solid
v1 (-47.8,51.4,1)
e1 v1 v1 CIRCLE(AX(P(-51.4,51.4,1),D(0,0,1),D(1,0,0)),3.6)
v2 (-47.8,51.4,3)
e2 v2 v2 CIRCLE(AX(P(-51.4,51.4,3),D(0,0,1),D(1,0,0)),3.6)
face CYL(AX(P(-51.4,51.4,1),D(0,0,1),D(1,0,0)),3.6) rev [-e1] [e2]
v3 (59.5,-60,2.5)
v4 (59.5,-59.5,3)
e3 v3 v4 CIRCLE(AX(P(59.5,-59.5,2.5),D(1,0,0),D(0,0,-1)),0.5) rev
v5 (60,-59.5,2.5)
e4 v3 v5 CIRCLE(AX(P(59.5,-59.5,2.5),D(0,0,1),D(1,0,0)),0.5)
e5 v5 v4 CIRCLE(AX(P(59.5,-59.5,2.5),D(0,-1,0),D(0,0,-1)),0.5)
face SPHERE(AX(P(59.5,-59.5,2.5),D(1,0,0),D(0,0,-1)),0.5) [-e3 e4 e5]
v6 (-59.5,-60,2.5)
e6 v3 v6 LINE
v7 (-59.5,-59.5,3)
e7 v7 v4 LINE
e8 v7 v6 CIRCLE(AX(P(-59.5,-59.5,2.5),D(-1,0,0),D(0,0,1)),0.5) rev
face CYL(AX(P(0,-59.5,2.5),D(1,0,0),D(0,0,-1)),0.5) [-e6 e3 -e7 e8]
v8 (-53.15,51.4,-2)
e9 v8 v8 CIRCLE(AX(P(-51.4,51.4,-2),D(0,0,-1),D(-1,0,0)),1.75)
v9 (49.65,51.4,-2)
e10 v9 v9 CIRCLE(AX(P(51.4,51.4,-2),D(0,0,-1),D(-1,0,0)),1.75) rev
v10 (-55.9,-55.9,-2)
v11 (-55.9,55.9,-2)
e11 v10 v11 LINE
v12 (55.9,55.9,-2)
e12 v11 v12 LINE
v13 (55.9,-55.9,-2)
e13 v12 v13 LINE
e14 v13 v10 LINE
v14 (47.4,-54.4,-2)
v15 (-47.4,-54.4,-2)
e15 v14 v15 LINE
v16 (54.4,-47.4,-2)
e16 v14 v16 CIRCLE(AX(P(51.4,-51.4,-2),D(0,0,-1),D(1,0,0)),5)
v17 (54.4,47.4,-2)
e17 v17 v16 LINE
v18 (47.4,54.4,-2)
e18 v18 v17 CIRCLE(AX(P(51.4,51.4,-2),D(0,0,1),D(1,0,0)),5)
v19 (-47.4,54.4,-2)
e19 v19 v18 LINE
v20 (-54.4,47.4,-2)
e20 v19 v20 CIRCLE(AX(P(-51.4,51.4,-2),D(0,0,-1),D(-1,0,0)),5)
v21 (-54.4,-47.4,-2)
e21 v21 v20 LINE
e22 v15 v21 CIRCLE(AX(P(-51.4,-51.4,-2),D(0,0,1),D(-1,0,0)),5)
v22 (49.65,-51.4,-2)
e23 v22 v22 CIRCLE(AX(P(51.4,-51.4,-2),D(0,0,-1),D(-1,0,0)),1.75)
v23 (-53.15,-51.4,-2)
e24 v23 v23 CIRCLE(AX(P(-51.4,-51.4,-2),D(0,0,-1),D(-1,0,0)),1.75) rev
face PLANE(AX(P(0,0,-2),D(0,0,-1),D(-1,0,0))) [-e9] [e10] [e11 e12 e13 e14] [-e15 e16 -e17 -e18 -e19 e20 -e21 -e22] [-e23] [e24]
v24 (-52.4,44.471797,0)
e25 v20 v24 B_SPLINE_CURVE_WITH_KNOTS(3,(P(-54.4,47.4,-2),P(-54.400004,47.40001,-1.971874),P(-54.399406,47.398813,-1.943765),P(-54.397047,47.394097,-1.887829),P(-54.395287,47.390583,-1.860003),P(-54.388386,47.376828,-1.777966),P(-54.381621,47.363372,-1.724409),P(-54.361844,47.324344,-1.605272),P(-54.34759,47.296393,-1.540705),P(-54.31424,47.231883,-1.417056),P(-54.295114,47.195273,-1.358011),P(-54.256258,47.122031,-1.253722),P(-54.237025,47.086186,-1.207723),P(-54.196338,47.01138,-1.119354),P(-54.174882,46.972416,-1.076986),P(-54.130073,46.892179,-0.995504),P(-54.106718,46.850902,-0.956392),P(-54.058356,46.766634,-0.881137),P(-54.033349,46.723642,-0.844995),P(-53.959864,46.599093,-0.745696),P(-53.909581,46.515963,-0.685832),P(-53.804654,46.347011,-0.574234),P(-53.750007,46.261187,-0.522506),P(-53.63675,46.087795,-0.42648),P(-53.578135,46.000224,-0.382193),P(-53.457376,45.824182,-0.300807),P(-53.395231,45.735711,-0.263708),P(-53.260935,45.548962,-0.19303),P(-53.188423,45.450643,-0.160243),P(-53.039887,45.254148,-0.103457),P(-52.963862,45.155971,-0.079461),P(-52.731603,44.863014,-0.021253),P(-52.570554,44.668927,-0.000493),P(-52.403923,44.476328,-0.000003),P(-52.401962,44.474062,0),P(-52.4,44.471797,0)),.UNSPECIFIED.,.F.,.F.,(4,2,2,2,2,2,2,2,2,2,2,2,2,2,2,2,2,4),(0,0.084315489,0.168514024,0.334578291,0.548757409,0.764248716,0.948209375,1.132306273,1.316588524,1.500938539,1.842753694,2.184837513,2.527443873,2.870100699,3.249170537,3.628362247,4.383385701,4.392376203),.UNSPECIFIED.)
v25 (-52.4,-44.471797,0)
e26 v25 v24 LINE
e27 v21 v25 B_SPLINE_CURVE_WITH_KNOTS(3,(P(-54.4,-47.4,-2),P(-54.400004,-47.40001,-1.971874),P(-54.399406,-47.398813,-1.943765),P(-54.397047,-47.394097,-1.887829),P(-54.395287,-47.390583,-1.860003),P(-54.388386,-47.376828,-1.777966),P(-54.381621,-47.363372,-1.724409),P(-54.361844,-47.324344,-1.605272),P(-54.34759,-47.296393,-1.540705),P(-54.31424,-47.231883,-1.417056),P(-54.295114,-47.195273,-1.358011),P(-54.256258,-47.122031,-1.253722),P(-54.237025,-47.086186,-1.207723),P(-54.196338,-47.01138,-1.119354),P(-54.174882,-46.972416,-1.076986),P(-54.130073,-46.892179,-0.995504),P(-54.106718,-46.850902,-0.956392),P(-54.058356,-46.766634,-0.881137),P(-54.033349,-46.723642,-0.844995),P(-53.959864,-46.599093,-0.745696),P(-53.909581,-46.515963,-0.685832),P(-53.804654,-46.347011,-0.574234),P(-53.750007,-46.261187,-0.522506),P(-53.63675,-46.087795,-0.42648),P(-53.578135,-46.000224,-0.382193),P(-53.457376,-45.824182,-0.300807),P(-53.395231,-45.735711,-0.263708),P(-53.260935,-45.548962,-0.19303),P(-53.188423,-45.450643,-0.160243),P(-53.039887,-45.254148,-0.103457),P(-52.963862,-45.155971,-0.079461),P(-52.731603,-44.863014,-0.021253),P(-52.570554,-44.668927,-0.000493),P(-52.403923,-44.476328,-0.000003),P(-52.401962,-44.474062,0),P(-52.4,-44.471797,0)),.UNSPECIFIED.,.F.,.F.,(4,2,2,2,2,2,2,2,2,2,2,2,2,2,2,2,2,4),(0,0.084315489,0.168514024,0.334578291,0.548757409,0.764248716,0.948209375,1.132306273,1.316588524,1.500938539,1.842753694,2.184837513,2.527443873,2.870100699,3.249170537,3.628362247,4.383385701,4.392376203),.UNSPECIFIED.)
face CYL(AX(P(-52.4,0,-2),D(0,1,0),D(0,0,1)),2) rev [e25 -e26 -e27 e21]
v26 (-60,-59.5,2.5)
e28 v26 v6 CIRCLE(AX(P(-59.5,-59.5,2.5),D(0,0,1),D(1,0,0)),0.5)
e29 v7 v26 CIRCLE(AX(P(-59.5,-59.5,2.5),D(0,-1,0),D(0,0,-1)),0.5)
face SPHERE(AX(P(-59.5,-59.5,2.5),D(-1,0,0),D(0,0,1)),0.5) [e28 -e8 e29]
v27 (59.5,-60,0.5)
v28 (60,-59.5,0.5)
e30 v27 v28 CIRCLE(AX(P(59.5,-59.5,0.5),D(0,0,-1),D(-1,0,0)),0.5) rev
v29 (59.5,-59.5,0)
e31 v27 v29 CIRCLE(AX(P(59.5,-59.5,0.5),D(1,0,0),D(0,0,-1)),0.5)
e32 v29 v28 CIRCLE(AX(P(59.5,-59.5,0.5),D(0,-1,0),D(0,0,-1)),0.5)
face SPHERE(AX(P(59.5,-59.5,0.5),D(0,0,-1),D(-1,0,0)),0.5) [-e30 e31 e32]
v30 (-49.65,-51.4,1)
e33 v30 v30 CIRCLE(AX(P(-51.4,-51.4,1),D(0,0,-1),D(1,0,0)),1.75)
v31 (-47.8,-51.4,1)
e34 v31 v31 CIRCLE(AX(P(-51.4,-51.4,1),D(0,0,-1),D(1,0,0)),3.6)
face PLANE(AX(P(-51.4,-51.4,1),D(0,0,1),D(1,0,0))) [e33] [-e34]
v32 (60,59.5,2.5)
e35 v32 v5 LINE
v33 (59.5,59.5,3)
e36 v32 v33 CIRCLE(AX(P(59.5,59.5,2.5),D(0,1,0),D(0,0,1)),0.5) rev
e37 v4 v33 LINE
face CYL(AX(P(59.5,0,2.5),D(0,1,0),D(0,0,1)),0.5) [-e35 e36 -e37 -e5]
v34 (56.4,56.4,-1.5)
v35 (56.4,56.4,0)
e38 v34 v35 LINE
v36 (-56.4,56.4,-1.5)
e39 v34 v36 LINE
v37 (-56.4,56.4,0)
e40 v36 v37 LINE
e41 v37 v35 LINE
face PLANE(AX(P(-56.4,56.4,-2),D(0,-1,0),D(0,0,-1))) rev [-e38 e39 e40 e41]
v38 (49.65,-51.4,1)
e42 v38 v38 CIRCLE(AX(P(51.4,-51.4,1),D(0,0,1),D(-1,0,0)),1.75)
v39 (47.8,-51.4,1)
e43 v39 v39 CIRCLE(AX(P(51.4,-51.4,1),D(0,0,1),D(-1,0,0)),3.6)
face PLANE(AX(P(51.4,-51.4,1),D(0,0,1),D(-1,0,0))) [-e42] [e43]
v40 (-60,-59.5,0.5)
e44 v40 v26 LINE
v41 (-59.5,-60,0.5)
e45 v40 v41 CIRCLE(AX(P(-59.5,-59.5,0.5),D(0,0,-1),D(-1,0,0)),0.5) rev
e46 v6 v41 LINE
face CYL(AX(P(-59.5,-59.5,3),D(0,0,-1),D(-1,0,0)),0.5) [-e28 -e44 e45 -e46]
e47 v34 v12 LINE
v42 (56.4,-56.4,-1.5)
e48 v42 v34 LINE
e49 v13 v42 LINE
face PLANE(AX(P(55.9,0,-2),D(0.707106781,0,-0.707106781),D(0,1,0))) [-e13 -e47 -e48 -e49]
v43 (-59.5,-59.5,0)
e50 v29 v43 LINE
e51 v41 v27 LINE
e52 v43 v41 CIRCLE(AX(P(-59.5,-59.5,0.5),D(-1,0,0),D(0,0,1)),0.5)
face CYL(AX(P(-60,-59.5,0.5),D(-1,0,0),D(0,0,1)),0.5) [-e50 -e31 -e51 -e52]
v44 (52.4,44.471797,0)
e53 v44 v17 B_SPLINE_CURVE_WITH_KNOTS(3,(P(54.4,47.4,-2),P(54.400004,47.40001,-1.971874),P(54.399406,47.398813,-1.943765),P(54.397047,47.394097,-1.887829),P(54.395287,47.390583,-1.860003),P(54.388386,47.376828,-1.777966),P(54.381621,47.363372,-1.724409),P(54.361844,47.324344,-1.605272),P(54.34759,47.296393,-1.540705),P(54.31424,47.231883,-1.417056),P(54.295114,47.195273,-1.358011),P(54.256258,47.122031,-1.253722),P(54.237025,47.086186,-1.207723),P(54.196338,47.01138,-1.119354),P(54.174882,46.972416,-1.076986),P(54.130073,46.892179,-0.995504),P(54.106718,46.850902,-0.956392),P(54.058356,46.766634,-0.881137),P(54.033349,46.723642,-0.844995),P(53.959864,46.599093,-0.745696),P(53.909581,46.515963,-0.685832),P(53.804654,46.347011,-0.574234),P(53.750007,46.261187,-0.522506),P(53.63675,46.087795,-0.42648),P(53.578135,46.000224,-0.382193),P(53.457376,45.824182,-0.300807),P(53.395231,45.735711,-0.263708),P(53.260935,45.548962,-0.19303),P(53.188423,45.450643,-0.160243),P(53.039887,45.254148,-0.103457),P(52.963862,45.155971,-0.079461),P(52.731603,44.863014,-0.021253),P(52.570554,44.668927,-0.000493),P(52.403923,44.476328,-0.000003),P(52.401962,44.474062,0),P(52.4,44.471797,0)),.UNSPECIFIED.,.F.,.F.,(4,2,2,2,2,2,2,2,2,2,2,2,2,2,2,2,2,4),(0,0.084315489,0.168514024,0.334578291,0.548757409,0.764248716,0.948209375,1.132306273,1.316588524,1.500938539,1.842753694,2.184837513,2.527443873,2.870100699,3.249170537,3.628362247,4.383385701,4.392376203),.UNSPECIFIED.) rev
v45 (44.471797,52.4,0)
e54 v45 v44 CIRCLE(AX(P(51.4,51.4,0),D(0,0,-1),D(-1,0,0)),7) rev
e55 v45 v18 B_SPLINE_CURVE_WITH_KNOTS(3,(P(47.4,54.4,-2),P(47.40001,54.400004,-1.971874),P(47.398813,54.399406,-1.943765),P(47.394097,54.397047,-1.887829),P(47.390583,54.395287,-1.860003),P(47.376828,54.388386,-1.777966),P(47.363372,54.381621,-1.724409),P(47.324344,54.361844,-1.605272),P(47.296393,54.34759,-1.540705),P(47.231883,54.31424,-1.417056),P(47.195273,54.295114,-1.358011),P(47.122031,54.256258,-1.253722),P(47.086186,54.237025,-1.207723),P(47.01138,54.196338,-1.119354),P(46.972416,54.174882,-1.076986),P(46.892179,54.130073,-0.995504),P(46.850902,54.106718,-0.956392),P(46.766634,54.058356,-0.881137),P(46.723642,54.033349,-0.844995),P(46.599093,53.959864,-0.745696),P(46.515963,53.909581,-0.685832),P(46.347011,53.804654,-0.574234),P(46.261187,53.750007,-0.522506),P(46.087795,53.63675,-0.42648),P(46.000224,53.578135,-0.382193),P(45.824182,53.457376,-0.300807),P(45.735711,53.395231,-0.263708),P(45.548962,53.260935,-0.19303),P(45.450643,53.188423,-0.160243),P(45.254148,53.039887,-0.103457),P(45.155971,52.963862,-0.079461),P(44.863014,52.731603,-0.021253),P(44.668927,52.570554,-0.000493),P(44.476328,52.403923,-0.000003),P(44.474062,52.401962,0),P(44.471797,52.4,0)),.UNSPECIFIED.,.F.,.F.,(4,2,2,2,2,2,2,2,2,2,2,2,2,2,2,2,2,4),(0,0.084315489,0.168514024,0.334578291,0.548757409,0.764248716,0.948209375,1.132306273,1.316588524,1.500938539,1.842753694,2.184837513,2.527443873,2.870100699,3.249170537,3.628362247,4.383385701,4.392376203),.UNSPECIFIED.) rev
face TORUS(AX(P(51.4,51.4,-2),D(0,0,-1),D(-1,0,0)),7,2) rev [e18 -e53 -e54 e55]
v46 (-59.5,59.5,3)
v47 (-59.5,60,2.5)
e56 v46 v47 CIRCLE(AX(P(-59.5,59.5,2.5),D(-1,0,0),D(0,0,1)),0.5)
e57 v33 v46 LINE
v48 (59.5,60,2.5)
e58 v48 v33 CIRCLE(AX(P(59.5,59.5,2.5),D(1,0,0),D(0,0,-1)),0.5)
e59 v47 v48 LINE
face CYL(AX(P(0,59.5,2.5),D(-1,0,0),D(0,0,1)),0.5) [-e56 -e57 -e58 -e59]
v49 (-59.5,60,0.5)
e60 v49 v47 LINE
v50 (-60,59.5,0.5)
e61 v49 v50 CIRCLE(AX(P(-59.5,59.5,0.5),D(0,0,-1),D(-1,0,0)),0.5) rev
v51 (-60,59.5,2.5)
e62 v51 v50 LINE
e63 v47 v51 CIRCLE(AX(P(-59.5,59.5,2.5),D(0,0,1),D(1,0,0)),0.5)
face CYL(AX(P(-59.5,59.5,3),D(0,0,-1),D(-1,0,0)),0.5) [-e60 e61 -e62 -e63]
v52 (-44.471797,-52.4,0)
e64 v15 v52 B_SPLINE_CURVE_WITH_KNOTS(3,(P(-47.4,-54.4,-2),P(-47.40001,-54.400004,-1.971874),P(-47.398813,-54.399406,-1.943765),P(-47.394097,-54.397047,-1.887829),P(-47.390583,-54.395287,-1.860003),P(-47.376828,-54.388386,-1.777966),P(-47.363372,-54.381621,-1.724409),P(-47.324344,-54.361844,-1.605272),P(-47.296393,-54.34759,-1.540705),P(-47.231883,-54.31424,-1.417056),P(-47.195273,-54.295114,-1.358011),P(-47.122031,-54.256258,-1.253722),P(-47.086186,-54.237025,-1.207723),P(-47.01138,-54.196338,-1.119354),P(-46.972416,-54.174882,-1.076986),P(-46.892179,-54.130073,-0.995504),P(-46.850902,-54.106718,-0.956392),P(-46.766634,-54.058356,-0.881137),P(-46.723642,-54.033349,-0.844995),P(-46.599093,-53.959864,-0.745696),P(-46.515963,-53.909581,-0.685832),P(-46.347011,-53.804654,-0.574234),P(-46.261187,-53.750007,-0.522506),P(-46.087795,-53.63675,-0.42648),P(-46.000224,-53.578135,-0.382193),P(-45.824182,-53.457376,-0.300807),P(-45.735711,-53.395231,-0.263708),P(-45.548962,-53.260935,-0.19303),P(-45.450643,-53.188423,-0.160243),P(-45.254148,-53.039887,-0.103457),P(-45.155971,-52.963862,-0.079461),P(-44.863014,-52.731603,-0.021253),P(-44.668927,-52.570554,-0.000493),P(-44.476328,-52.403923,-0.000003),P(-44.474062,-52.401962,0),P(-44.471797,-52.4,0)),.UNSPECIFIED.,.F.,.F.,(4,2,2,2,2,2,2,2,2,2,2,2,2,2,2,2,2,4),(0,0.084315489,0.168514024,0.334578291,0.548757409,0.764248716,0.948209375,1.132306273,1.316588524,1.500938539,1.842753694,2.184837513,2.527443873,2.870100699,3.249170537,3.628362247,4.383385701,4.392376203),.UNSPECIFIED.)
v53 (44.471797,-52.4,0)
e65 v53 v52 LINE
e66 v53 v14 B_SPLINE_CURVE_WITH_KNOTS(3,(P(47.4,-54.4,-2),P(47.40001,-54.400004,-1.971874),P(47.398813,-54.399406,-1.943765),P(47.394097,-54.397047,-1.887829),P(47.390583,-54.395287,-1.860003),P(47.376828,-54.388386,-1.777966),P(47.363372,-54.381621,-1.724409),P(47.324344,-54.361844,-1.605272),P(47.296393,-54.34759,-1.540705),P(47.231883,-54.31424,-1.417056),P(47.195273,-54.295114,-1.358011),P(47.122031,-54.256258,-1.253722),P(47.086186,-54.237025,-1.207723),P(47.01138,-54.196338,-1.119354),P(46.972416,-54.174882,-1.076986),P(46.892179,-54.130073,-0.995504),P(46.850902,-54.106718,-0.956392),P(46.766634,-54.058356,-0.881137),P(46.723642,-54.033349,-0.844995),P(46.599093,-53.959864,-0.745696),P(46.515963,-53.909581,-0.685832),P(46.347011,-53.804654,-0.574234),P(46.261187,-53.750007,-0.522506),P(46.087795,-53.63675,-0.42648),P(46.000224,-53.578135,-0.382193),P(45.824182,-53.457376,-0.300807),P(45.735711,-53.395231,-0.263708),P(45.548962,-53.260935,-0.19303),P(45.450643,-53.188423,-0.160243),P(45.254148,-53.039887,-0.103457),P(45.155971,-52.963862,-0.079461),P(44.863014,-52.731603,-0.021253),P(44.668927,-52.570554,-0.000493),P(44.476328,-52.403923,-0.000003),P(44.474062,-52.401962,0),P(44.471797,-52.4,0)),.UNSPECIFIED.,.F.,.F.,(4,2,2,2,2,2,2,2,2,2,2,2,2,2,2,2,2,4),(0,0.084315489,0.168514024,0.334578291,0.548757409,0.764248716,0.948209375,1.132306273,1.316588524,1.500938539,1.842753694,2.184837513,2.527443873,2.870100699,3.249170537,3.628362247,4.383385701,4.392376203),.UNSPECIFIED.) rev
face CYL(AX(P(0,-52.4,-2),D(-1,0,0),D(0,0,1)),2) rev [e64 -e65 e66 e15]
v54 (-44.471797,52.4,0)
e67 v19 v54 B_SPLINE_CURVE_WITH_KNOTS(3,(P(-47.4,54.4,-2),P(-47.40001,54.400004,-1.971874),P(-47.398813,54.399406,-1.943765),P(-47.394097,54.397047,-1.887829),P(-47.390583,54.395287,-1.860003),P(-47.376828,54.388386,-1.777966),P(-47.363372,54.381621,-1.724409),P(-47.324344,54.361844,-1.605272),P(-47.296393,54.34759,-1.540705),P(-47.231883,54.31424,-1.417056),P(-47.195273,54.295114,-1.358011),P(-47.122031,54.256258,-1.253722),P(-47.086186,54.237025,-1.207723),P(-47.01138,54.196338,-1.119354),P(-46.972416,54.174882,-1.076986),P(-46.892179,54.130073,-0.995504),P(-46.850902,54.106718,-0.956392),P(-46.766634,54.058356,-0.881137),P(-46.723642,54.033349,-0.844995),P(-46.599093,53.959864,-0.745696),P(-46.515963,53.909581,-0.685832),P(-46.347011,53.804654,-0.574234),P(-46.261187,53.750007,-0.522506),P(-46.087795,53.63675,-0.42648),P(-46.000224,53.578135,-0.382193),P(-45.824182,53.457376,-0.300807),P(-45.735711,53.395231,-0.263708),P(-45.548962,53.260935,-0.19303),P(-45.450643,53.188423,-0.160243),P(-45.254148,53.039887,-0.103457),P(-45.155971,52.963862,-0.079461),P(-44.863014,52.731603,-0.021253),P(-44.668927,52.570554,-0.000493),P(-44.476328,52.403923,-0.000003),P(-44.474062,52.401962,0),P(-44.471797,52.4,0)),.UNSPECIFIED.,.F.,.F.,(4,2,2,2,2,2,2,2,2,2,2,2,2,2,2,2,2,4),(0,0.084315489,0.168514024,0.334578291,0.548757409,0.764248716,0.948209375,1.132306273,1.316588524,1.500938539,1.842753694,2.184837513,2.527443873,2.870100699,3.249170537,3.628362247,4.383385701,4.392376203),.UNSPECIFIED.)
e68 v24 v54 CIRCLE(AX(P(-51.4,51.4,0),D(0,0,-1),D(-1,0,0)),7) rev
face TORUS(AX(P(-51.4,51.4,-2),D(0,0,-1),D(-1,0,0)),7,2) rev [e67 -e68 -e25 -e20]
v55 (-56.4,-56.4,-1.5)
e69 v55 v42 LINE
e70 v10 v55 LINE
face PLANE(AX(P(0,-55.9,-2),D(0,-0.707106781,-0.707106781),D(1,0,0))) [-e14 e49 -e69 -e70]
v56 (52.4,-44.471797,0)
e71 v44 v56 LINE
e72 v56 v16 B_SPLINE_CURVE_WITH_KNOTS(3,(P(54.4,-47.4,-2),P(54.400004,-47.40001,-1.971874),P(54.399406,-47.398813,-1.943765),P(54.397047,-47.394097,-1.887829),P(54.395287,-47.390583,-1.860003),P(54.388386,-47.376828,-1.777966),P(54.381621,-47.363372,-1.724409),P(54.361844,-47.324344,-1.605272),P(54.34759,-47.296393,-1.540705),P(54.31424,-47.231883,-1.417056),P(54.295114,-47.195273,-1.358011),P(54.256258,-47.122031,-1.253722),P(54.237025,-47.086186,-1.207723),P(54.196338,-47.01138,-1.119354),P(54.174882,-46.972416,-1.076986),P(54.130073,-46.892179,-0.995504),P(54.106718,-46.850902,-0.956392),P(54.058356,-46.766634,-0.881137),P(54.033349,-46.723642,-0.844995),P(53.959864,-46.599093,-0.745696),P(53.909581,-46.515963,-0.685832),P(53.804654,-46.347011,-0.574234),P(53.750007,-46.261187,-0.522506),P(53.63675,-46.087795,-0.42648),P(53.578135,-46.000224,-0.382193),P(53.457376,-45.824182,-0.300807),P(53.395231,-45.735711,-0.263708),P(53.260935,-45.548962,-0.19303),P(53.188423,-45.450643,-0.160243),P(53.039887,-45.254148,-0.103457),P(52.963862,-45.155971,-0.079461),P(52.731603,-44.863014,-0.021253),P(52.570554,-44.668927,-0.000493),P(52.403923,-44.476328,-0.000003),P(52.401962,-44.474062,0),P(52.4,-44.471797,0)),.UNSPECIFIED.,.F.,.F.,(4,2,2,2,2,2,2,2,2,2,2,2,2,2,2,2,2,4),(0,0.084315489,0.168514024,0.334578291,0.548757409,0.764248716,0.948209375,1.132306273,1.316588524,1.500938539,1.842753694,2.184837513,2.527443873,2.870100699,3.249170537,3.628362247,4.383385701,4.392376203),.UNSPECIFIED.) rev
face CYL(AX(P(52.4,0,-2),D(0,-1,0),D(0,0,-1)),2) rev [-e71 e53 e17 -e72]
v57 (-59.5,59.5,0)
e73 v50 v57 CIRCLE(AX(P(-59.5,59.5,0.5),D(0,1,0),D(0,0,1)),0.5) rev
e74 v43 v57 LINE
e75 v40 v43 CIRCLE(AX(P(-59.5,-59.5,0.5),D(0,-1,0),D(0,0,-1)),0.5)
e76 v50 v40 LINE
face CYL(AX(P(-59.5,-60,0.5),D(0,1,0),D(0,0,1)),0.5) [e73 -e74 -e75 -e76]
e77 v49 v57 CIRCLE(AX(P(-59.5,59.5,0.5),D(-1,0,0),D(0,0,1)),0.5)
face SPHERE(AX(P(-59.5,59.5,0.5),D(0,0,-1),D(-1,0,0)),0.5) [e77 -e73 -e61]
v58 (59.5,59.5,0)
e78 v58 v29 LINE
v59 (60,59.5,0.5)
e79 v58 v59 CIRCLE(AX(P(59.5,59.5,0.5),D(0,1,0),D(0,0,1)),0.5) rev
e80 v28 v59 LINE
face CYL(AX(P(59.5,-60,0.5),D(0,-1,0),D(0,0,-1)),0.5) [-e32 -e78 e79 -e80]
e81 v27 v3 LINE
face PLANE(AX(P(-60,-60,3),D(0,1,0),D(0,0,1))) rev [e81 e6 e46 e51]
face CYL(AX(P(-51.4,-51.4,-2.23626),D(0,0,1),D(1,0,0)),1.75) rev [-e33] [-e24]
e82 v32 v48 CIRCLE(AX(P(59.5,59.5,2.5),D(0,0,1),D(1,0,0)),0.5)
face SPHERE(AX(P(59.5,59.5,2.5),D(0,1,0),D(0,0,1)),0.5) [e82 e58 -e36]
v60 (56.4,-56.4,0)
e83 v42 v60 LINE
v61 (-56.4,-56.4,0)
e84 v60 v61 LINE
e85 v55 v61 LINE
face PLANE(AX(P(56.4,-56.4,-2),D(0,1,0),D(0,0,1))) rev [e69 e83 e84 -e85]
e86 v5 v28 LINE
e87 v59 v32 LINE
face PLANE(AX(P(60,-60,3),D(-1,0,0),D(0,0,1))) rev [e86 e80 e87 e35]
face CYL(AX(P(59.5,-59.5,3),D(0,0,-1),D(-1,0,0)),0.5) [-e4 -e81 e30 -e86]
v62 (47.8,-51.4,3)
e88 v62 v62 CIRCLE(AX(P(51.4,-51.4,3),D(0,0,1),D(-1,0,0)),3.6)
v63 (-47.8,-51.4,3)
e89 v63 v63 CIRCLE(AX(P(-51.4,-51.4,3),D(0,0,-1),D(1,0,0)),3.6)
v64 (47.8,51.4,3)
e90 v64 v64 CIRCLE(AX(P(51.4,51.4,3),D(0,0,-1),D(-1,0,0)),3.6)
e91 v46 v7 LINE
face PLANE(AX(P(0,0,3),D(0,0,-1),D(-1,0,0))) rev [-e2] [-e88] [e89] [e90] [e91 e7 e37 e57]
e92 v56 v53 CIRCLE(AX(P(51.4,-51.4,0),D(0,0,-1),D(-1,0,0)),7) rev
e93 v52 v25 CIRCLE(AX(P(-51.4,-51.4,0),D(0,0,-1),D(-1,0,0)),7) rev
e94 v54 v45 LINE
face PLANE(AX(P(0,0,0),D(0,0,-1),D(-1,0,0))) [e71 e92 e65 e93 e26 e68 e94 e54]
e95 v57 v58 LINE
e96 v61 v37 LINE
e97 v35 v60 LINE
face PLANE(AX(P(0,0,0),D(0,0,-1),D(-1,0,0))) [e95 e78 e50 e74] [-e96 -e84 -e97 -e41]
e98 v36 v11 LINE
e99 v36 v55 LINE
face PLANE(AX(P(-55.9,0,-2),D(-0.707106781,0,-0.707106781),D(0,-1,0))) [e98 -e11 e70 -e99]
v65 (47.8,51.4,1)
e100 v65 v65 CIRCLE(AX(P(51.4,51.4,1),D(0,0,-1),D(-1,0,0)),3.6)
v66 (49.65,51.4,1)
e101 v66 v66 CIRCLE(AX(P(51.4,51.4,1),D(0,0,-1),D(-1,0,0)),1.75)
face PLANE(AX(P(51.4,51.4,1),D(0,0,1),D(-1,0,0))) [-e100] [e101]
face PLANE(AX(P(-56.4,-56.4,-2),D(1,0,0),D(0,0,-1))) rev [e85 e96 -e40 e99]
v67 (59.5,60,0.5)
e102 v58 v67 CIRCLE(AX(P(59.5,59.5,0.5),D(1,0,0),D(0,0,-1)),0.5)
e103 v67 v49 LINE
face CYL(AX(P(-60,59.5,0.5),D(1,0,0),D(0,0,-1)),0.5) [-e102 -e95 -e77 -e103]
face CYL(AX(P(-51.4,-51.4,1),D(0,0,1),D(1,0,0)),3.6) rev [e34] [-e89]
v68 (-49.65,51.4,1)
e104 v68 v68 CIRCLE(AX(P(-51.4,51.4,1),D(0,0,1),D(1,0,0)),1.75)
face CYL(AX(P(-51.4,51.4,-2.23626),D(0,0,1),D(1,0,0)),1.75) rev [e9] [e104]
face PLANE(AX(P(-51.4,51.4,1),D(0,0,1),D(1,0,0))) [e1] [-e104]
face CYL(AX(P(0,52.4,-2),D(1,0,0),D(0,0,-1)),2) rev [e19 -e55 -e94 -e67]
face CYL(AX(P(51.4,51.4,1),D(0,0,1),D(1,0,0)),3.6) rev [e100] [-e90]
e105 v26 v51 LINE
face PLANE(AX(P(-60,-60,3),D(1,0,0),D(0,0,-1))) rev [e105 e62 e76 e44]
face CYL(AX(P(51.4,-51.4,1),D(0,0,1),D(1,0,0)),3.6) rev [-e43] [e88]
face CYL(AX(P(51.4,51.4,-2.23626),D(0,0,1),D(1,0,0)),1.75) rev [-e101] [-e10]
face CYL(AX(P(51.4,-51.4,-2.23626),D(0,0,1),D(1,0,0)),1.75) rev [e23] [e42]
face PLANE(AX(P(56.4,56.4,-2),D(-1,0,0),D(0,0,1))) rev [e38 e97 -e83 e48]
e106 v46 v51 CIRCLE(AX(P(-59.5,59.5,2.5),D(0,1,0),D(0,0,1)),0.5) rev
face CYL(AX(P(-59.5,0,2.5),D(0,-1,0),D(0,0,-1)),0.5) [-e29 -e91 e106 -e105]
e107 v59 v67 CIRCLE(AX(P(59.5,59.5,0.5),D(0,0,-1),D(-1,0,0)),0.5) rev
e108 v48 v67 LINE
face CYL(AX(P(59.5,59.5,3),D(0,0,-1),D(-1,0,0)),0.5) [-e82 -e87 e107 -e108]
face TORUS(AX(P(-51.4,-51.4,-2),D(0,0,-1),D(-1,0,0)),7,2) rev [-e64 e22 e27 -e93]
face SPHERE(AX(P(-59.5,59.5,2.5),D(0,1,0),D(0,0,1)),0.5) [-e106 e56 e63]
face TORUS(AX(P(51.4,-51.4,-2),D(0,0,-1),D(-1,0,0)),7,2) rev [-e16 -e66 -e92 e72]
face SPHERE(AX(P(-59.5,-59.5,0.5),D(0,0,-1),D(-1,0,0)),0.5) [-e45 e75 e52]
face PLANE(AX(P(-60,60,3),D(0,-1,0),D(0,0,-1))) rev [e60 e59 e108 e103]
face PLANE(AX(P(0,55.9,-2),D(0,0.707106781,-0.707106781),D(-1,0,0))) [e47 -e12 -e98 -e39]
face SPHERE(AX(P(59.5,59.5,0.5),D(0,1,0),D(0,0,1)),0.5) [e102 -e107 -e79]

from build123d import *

# Parameters (mm, degrees)
ESBO_O1_W                 = 120
ESBO_O1_H                 = 120
RESSALTO_EXTRUS_O1_DEPTH  = 3
ESBO_O2_W                 = 112.8
ESBO_O2_H                 = 112.8
RESSALTO_EXTRUS_O2_DEPTH  = 2
ESBO_O3_W                 = 108.8
ESBO_O3_H                 = 108.8
CORTE_EXTRUS_O1_DEPTH     = 2
ESBO_O5_R                 = 5
RESSALTO_EXTRUS_O3_DEPTH  = 2
ESPELHAR2_COPY_1_SKETCH_R = 5
ESPELHAR2_COPY_1_DEPTH    = 2
CHANFRO1_SIZE             = 0.5
FILETE1_R                 = 2
ESBO_O6_R                 = 3.6
CORTE_EXTRUS_O2_DEPTH     = 2
ESBO_O7_R                 = 1.75
CORTE_EXTRUS_O3_DEPTH     = 85.905830189
ESPELHAR4_COPY_1_SKETCH_R = 3.6
ESPELHAR4_COPY_1_DEPTH    = 2
ESPELHAR4_COPY_2_SKETCH_R = 1.75
ESPELHAR4_COPY_2_DEPTH    = 85.905830189
FILETE2_R                 = 0.5


with BuildPart() as part:
    # Esboço1 → Ressalto-extrusão1 (new body)
    with BuildSketch(Plane.XY):
        Rectangle(ESBO_O1_W, ESBO_O1_H)
    extrude(amount=RESSALTO_EXTRUS_O1_DEPTH)

    # Esboço2 → Ressalto-extrusão2 (add)
    with BuildSketch(Plane(origin=(0, 0, 0), x_dir=(-1, 0, 0), z_dir=(0, 0, -1))):
        Rectangle(ESBO_O2_W, ESBO_O2_H)
    extrude(amount=RESSALTO_EXTRUS_O2_DEPTH)

    # Esboço3 → Corte-extrusão1 (cut)
    with BuildSketch(Plane(origin=(0, 0, -2), x_dir=(-1, 0, 0), z_dir=(0, 0, -1))):
        Rectangle(ESBO_O3_W, ESBO_O3_H)
    extrude(amount=-CORTE_EXTRUS_O1_DEPTH, mode=Mode.SUBTRACT)

    # Esboço5 → Ressalto-extrusão3 (add)
    with BuildSketch(Plane(origin=(0, 0, 0), x_dir=(-1, 0, 0), z_dir=(0, 0, -1))):
        with Locations((51.4, 51.4)):
            Circle(ESBO_O5_R)
    ressalto_extrus_o3 = extrude(amount=RESSALTO_EXTRUS_O3_DEPTH)

    # Espelhar1: Ressalto-extrusão3 across plane
    add(ressalto_extrus_o3.mirror(Plane(origin=(0, 0, 0), x_dir=(0, 0, 1), z_dir=(1, 0, 0))))

    # Espelhar2: Ressalto-extrusão3 across plane
    add(ressalto_extrus_o3.mirror(Plane.ZX))

    # Espelhar2 copy 1 sketch → Espelhar2 copy 1 (add)
    with BuildSketch(Plane(origin=(0, 0, 0), x_dir=(1, 0, 0), z_dir=(0, 0, -1))):
        with Locations((51.4, 51.4)):
            Circle(ESPELHAR2_COPY_1_SKETCH_R)
    extrude(amount=ESPELHAR2_COPY_1_DEPTH)

    # Chanfro1
    chanfro1_edges = [part.edges().sort_by_distance(p)[0] for p in [
        (0, 56.4, -2),
        (56.4, 0, -2),
        (0, -56.4, -2),
        (-56.4, 0, -2),
    ]]
    chamfer(chanfro1_edges, length=CHANFRO1_SIZE)

    # Filete1
    filete1_edges = [part.edges().sort_by_distance(p)[0] for p in [
        (0, -54.4, 0),
        (47.864466094, -47.864466094, 0),
        (54.4, 0, 0),
        (47.864466094, 47.864466094, 0),
        (0, 54.4, 0),
        (-47.864466094, 47.864466094, 0),
        (-54.4, 0, 0),
        (-47.864466094, -47.864466094, 0),
    ]]
    fillet(filete1_edges, radius=FILETE1_R - 0.0001)  # a hair under: the kernel refuses the full size

    # Esboço6 → Corte-extrusão2 (cut)
    with BuildSketch(Plane.XY.offset(3)):
        with Locations((-51.4, 51.4)):
            Circle(ESBO_O6_R)
    corte_extrus_o2 = extrude(amount=-CORTE_EXTRUS_O2_DEPTH, mode=Mode.SUBTRACT)

    # Esboço7 → Corte-extrusão3 (cut, through all)
    with BuildSketch(Plane.XY.offset(1)):
        with Locations((-51.4, 51.4)):
            Circle(ESBO_O7_R)
    corte_extrus_o3 = extrude(amount=-CORTE_EXTRUS_O3_DEPTH, mode=Mode.SUBTRACT)

    # Espelhar3: Corte-extrusão2, Corte-extrusão3 across plane
    add(corte_extrus_o2.mirror(Plane(origin=(0, 0, 0), x_dir=(0, 0, 1), z_dir=(1, 0, 0))), mode=Mode.SUBTRACT)
    add(corte_extrus_o3.mirror(Plane(origin=(0, 0, 0), x_dir=(0, 0, 1), z_dir=(1, 0, 0))), mode=Mode.SUBTRACT)

    # Espelhar4: Corte-extrusão2, Corte-extrusão3 across plane
    add(corte_extrus_o2.mirror(Plane.ZX), mode=Mode.SUBTRACT)
    add(corte_extrus_o3.mirror(Plane.ZX), mode=Mode.SUBTRACT)

    # Espelhar4 copy 1 sketch → Espelhar4 copy 1 (cut)
    with BuildSketch(Plane(origin=(0, 0, 3), x_dir=(-1, 0, 0), z_dir=(0, 0, 1))):
        with Locations((-51.4, 51.4)):
            Circle(ESPELHAR4_COPY_1_SKETCH_R)
    extrude(amount=-ESPELHAR4_COPY_1_DEPTH, mode=Mode.SUBTRACT)

    # Espelhar4 copy 2 sketch → Espelhar4 copy 2 (cut, through all)
    with BuildSketch(Plane(origin=(0, 0, 1), x_dir=(-1, 0, 0), z_dir=(0, 0, 1))):
        with Locations((-51.4, 51.4)):
            Circle(ESPELHAR4_COPY_2_SKETCH_R)
    extrude(amount=-ESPELHAR4_COPY_2_DEPTH, mode=Mode.SUBTRACT)

    # Filete2
    filete2_edges = [part.edges().sort_by_distance(p)[0] for p in [
        (-60, 0, 3),
        (0, -60, 3),
        (60, 0, 3),
        (0, -60, 0),
        (-60, 0, 0),
        (0, 60, 0),
        (60, 0, 0),
        (60, -60, 1.5),
        (-60, -60, 1.5),
        (-60, 60, 1.5),
        (60, 60, 1.5),
        (0, 60, 3),
    ]]
    fillet(filete2_edges, radius=FILETE2_R)


solid = part.part
